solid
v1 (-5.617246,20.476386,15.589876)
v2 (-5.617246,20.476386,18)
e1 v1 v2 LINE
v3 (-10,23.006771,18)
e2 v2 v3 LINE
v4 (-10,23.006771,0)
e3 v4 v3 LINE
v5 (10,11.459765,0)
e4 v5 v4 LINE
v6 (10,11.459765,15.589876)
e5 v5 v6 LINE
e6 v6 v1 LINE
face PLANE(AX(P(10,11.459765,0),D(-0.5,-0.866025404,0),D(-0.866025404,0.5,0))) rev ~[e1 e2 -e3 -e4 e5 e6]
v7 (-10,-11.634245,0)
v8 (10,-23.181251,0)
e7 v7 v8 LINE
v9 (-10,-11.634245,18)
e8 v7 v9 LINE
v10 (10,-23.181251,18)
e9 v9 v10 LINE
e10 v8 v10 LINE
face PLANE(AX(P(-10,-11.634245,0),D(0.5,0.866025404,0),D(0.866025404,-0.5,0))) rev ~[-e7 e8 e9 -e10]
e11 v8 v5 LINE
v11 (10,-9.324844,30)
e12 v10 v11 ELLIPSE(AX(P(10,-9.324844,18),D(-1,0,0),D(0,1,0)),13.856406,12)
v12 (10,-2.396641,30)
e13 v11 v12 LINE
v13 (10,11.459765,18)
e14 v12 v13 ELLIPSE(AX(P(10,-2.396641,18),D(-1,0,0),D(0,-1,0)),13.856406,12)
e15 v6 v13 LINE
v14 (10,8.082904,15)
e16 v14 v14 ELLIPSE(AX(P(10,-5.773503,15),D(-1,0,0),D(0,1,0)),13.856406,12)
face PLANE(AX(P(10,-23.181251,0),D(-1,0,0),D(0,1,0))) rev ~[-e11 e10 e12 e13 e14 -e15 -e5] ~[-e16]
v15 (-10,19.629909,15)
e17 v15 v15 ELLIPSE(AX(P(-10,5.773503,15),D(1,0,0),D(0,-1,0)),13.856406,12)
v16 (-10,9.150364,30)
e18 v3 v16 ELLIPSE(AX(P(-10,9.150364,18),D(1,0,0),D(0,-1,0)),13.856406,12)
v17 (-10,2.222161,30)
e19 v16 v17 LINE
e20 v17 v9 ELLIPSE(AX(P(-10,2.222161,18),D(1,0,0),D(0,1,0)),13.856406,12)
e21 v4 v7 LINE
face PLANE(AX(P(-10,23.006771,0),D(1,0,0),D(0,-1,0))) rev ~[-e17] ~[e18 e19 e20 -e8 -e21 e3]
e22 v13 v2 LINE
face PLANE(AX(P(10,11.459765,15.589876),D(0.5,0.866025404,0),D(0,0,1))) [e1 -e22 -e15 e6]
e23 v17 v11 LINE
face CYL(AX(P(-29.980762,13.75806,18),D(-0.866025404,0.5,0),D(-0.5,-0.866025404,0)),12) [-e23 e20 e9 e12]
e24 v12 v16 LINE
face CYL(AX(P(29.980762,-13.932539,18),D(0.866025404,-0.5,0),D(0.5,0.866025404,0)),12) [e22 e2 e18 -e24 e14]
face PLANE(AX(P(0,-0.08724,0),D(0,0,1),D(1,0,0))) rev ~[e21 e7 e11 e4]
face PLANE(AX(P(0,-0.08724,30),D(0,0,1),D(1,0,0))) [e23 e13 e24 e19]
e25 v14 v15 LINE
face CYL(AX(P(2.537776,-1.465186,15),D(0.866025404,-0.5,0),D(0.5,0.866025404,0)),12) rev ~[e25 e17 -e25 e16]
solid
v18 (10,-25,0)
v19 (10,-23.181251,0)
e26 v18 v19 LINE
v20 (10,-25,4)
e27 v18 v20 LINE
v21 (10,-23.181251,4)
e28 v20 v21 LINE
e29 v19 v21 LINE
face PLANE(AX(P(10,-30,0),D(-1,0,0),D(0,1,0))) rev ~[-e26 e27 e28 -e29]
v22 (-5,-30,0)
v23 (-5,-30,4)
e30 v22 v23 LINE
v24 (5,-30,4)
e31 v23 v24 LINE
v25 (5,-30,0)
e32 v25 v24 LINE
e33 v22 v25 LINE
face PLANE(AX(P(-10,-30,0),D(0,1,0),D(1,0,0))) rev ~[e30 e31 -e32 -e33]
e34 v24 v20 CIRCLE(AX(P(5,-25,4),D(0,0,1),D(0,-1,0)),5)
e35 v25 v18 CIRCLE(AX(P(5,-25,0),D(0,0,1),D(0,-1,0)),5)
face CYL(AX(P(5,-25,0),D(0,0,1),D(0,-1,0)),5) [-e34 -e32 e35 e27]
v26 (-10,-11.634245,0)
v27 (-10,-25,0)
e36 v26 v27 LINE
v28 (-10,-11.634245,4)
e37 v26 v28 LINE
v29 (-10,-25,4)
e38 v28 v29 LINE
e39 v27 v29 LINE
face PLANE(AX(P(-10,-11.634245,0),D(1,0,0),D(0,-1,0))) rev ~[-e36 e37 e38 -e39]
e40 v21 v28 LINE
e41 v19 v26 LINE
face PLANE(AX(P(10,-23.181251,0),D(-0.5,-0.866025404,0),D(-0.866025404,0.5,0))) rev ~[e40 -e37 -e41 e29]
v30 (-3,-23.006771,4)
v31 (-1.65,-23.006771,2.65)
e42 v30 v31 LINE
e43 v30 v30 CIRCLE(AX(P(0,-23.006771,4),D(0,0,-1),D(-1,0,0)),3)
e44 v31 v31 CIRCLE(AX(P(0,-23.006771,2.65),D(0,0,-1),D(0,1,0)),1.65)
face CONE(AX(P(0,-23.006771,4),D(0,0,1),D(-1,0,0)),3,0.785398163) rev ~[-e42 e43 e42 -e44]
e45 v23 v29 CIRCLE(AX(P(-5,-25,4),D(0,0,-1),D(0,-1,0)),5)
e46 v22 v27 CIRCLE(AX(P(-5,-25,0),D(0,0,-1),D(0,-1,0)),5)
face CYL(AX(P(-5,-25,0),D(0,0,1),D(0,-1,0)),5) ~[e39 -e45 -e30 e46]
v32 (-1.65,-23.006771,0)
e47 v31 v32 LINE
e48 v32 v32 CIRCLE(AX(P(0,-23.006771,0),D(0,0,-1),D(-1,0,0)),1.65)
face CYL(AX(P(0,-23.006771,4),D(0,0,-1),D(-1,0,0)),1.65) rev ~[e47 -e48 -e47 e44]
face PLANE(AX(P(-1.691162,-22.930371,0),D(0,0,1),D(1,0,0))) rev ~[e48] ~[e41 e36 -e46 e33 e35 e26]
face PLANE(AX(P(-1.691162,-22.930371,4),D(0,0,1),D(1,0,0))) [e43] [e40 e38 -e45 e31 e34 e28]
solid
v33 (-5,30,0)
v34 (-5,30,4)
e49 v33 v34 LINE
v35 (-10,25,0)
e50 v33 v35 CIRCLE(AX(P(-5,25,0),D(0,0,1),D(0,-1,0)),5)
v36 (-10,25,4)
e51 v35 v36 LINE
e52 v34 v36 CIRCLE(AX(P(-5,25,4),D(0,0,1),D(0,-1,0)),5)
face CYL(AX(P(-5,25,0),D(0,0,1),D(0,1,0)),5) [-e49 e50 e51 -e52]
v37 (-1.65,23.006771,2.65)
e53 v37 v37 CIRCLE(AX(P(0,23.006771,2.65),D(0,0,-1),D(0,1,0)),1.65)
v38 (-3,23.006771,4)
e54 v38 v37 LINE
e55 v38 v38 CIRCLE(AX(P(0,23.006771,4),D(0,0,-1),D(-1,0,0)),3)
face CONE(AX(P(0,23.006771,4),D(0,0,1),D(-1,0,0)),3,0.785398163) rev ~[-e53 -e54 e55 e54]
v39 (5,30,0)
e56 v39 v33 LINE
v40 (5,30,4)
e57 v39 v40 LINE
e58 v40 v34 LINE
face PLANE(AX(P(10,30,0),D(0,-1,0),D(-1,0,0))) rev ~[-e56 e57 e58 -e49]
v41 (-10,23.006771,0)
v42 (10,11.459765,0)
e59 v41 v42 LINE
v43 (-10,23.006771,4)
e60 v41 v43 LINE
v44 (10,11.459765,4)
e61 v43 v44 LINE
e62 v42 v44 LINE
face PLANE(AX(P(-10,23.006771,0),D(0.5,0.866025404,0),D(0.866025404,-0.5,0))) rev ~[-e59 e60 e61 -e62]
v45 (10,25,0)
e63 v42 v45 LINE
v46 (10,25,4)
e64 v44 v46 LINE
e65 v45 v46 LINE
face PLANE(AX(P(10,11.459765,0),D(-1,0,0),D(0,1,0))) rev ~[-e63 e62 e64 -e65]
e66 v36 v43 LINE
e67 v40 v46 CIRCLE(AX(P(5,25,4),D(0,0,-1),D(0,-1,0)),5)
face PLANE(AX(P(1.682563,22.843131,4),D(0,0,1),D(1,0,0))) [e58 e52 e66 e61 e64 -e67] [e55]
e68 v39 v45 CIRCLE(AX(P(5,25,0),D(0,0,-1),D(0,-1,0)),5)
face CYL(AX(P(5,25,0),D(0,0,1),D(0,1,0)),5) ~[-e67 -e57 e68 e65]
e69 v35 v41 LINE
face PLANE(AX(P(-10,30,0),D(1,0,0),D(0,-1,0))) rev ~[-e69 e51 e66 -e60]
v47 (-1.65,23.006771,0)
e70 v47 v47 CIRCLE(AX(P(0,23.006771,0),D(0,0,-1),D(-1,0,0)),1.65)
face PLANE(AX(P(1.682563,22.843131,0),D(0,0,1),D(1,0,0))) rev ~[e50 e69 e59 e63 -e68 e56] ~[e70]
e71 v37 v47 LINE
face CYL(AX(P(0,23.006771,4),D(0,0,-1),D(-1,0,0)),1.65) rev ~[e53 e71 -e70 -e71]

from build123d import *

# Parameters (mm, degrees)
F1_DEPTH          = 4
F2_DEPTH          = 30
F3_W              = 18.0332418531
F3_H              = 11.783156544
F4_DEPTH          = 25
F6_R              = 12
F7_DEPTH          = 25
F7_DEPTH_BACK     = 25
F8_DEPTH          = 25
F10_D             = 3.3
F10_CSINK_D       = 6
F10_CSINK_ANGLE   = 90
F10_2_D           = 3.3
F10_2_CSINK_D     = 6
F10_2_CSINK_ANGLE = 90
F11_R             = 5
F11_2_R           = 5
F12_T1_DEPTH      = 83.0940107676
F12_T3_DEPTH      = 83.0940107676


# Not quite as in the source:
# - a fillet or chamfer that OpenCascade refuses, or shapes differently, is made with other operations: its cross-section is extruded or revolved along the edge and cut away or added


with BuildPart() as f1:
    # F0 (on Top) → F1 (new body)
    with BuildSketch(Plane.XY):
        Polygon((10, 30), (-10, 30), (-10, 23.0067708135), (10, 11.4597654297), align=None)
    extrude(amount=F1_DEPTH)

    # F10 (through all)
    with Locations(Plane.XY.offset(4)):
        with Locations((0, 23.0067708135), (0, -23.0067708135)):
            CounterSinkHole(F10_D / 2, F10_CSINK_D / 2, counter_sink_angle=F10_CSINK_ANGLE)

    # F11
    f11_edges = [f1.edges().sort_by_distance(p)[0] for p in [
        (10, 30, 2),
        (-10, 30, 2),
    ]]
    fillet(f11_edges, radius=F11_R)


with BuildPart() as f1b:
    # F0 (on Top) → F1, piece 2 (new body)
    with BuildSketch(Plane.XY):
        Polygon((10, -23.1812507217), (-10, -11.6342453379), (-10, -30), (10, -30), align=None)
    extrude(amount=F1_DEPTH)

    # F10#2 (through all)
    with Locations(Plane.XY.offset(4)):
        with Locations((0, 23.0067708135), (0, -23.0067708135)):
            CounterSinkHole(F10_2_D / 2, F10_2_CSINK_D / 2, counter_sink_angle=F10_2_CSINK_ANGLE)

    # F11#2
    f11_2_edges = [f1b.edges().sort_by_distance(p)[0] for p in [
        (-10, -30, 2),
        (10, -30, 2),
    ]]
    fillet(f11_2_edges, radius=F11_2_R)


with BuildPart() as f2:
    # F0 (on Top) → F2 (new body)
    with BuildSketch(Plane.XY):
        Polygon((10, 11.4597654297), (-10, 23.0067708135), (-10, -11.6342453379), (10, -23.1812507217), align=None)
    extrude(amount=F2_DEPTH)

    # F3 (on face) → F4 (join)
    with BuildSketch(Plane(origin=(7.4622239918, 12.9249510912, 0), x_dir=(-0.8660254038, 0.5, 0), z_dir=(0.5, 0.8660254038, 0))):
        with Locations((6.0862496035, 21.4814543724)):
            Rectangle(F3_W, F3_H)
    extrude(amount=F4_DEPTH)

    # F6 (on offset) → F7 (cut, two sides)
    with BuildSketch(Plane(origin=(2.5377760082, -1.4651856615, 0), x_dir=(0.5, 0.8660254038, 0), z_dir=(0.8660254038, -0.5, 0))) as f7_sk:
        with Locations((0, 15)):
            Circle(F6_R)
    extrude(amount=-F7_DEPTH, mode=Mode.SUBTRACT)
    extrude(f7_sk.sketch, amount=F7_DEPTH_BACK, mode=Mode.SUBTRACT)

    # F8 (cut): a face of the model
    f8_faces = [f2.faces().sort_by_distance(p)[0] for p in [
        (16.25, 22.285082977, 21.4814543724),
    ]]
    extrude(f8_faces, amount=-F8_DEPTH, mode=Mode.SUBTRACT)

    # F12: fillet of radius 12 on 2 edges, made by hand

    # F12_s2 → F12_t1 (cut)
    with BuildSketch(Plane(origin=(-28.4429861053, 16.4215656844, 0), x_dir=(0, 0, 1), z_dir=(0.8660254038, -0.5, 0))):
        with BuildLine():
            ThreePointArc((18, 15.0755520165), (26.4852813742, 11.5608333907), (30, 3.0755520165))
            Line((30, 3.0755520165), (30, 15.0755520165))
            Line((30, 15.0755520165), (18, 15.0755520165))
        make_face()
    extrude(amount=F12_T1_DEPTH, mode=Mode.SUBTRACT)

    # F12_s4 → F12_t3 (cut)
    with BuildSketch(Plane(origin=(28.5185381218, -16.4651856615, 0), x_dir=(0, 0, 1), z_dir=(-0.8660254038, 0.5, 0))):
        with BuildLine():
            ThreePointArc((18, 14.9244479835), (26.4852813742, 11.4097293577), (30, 2.9244479835))
            Line((30, 2.9244479835), (30, 14.9244479835))
            Line((30, 14.9244479835), (18, 14.9244479835))
        make_face()
    extrude(amount=F12_T3_DEPTH, mode=Mode.SUBTRACT)


solid = Compound([f1.part, f1b.part, f2.part])
